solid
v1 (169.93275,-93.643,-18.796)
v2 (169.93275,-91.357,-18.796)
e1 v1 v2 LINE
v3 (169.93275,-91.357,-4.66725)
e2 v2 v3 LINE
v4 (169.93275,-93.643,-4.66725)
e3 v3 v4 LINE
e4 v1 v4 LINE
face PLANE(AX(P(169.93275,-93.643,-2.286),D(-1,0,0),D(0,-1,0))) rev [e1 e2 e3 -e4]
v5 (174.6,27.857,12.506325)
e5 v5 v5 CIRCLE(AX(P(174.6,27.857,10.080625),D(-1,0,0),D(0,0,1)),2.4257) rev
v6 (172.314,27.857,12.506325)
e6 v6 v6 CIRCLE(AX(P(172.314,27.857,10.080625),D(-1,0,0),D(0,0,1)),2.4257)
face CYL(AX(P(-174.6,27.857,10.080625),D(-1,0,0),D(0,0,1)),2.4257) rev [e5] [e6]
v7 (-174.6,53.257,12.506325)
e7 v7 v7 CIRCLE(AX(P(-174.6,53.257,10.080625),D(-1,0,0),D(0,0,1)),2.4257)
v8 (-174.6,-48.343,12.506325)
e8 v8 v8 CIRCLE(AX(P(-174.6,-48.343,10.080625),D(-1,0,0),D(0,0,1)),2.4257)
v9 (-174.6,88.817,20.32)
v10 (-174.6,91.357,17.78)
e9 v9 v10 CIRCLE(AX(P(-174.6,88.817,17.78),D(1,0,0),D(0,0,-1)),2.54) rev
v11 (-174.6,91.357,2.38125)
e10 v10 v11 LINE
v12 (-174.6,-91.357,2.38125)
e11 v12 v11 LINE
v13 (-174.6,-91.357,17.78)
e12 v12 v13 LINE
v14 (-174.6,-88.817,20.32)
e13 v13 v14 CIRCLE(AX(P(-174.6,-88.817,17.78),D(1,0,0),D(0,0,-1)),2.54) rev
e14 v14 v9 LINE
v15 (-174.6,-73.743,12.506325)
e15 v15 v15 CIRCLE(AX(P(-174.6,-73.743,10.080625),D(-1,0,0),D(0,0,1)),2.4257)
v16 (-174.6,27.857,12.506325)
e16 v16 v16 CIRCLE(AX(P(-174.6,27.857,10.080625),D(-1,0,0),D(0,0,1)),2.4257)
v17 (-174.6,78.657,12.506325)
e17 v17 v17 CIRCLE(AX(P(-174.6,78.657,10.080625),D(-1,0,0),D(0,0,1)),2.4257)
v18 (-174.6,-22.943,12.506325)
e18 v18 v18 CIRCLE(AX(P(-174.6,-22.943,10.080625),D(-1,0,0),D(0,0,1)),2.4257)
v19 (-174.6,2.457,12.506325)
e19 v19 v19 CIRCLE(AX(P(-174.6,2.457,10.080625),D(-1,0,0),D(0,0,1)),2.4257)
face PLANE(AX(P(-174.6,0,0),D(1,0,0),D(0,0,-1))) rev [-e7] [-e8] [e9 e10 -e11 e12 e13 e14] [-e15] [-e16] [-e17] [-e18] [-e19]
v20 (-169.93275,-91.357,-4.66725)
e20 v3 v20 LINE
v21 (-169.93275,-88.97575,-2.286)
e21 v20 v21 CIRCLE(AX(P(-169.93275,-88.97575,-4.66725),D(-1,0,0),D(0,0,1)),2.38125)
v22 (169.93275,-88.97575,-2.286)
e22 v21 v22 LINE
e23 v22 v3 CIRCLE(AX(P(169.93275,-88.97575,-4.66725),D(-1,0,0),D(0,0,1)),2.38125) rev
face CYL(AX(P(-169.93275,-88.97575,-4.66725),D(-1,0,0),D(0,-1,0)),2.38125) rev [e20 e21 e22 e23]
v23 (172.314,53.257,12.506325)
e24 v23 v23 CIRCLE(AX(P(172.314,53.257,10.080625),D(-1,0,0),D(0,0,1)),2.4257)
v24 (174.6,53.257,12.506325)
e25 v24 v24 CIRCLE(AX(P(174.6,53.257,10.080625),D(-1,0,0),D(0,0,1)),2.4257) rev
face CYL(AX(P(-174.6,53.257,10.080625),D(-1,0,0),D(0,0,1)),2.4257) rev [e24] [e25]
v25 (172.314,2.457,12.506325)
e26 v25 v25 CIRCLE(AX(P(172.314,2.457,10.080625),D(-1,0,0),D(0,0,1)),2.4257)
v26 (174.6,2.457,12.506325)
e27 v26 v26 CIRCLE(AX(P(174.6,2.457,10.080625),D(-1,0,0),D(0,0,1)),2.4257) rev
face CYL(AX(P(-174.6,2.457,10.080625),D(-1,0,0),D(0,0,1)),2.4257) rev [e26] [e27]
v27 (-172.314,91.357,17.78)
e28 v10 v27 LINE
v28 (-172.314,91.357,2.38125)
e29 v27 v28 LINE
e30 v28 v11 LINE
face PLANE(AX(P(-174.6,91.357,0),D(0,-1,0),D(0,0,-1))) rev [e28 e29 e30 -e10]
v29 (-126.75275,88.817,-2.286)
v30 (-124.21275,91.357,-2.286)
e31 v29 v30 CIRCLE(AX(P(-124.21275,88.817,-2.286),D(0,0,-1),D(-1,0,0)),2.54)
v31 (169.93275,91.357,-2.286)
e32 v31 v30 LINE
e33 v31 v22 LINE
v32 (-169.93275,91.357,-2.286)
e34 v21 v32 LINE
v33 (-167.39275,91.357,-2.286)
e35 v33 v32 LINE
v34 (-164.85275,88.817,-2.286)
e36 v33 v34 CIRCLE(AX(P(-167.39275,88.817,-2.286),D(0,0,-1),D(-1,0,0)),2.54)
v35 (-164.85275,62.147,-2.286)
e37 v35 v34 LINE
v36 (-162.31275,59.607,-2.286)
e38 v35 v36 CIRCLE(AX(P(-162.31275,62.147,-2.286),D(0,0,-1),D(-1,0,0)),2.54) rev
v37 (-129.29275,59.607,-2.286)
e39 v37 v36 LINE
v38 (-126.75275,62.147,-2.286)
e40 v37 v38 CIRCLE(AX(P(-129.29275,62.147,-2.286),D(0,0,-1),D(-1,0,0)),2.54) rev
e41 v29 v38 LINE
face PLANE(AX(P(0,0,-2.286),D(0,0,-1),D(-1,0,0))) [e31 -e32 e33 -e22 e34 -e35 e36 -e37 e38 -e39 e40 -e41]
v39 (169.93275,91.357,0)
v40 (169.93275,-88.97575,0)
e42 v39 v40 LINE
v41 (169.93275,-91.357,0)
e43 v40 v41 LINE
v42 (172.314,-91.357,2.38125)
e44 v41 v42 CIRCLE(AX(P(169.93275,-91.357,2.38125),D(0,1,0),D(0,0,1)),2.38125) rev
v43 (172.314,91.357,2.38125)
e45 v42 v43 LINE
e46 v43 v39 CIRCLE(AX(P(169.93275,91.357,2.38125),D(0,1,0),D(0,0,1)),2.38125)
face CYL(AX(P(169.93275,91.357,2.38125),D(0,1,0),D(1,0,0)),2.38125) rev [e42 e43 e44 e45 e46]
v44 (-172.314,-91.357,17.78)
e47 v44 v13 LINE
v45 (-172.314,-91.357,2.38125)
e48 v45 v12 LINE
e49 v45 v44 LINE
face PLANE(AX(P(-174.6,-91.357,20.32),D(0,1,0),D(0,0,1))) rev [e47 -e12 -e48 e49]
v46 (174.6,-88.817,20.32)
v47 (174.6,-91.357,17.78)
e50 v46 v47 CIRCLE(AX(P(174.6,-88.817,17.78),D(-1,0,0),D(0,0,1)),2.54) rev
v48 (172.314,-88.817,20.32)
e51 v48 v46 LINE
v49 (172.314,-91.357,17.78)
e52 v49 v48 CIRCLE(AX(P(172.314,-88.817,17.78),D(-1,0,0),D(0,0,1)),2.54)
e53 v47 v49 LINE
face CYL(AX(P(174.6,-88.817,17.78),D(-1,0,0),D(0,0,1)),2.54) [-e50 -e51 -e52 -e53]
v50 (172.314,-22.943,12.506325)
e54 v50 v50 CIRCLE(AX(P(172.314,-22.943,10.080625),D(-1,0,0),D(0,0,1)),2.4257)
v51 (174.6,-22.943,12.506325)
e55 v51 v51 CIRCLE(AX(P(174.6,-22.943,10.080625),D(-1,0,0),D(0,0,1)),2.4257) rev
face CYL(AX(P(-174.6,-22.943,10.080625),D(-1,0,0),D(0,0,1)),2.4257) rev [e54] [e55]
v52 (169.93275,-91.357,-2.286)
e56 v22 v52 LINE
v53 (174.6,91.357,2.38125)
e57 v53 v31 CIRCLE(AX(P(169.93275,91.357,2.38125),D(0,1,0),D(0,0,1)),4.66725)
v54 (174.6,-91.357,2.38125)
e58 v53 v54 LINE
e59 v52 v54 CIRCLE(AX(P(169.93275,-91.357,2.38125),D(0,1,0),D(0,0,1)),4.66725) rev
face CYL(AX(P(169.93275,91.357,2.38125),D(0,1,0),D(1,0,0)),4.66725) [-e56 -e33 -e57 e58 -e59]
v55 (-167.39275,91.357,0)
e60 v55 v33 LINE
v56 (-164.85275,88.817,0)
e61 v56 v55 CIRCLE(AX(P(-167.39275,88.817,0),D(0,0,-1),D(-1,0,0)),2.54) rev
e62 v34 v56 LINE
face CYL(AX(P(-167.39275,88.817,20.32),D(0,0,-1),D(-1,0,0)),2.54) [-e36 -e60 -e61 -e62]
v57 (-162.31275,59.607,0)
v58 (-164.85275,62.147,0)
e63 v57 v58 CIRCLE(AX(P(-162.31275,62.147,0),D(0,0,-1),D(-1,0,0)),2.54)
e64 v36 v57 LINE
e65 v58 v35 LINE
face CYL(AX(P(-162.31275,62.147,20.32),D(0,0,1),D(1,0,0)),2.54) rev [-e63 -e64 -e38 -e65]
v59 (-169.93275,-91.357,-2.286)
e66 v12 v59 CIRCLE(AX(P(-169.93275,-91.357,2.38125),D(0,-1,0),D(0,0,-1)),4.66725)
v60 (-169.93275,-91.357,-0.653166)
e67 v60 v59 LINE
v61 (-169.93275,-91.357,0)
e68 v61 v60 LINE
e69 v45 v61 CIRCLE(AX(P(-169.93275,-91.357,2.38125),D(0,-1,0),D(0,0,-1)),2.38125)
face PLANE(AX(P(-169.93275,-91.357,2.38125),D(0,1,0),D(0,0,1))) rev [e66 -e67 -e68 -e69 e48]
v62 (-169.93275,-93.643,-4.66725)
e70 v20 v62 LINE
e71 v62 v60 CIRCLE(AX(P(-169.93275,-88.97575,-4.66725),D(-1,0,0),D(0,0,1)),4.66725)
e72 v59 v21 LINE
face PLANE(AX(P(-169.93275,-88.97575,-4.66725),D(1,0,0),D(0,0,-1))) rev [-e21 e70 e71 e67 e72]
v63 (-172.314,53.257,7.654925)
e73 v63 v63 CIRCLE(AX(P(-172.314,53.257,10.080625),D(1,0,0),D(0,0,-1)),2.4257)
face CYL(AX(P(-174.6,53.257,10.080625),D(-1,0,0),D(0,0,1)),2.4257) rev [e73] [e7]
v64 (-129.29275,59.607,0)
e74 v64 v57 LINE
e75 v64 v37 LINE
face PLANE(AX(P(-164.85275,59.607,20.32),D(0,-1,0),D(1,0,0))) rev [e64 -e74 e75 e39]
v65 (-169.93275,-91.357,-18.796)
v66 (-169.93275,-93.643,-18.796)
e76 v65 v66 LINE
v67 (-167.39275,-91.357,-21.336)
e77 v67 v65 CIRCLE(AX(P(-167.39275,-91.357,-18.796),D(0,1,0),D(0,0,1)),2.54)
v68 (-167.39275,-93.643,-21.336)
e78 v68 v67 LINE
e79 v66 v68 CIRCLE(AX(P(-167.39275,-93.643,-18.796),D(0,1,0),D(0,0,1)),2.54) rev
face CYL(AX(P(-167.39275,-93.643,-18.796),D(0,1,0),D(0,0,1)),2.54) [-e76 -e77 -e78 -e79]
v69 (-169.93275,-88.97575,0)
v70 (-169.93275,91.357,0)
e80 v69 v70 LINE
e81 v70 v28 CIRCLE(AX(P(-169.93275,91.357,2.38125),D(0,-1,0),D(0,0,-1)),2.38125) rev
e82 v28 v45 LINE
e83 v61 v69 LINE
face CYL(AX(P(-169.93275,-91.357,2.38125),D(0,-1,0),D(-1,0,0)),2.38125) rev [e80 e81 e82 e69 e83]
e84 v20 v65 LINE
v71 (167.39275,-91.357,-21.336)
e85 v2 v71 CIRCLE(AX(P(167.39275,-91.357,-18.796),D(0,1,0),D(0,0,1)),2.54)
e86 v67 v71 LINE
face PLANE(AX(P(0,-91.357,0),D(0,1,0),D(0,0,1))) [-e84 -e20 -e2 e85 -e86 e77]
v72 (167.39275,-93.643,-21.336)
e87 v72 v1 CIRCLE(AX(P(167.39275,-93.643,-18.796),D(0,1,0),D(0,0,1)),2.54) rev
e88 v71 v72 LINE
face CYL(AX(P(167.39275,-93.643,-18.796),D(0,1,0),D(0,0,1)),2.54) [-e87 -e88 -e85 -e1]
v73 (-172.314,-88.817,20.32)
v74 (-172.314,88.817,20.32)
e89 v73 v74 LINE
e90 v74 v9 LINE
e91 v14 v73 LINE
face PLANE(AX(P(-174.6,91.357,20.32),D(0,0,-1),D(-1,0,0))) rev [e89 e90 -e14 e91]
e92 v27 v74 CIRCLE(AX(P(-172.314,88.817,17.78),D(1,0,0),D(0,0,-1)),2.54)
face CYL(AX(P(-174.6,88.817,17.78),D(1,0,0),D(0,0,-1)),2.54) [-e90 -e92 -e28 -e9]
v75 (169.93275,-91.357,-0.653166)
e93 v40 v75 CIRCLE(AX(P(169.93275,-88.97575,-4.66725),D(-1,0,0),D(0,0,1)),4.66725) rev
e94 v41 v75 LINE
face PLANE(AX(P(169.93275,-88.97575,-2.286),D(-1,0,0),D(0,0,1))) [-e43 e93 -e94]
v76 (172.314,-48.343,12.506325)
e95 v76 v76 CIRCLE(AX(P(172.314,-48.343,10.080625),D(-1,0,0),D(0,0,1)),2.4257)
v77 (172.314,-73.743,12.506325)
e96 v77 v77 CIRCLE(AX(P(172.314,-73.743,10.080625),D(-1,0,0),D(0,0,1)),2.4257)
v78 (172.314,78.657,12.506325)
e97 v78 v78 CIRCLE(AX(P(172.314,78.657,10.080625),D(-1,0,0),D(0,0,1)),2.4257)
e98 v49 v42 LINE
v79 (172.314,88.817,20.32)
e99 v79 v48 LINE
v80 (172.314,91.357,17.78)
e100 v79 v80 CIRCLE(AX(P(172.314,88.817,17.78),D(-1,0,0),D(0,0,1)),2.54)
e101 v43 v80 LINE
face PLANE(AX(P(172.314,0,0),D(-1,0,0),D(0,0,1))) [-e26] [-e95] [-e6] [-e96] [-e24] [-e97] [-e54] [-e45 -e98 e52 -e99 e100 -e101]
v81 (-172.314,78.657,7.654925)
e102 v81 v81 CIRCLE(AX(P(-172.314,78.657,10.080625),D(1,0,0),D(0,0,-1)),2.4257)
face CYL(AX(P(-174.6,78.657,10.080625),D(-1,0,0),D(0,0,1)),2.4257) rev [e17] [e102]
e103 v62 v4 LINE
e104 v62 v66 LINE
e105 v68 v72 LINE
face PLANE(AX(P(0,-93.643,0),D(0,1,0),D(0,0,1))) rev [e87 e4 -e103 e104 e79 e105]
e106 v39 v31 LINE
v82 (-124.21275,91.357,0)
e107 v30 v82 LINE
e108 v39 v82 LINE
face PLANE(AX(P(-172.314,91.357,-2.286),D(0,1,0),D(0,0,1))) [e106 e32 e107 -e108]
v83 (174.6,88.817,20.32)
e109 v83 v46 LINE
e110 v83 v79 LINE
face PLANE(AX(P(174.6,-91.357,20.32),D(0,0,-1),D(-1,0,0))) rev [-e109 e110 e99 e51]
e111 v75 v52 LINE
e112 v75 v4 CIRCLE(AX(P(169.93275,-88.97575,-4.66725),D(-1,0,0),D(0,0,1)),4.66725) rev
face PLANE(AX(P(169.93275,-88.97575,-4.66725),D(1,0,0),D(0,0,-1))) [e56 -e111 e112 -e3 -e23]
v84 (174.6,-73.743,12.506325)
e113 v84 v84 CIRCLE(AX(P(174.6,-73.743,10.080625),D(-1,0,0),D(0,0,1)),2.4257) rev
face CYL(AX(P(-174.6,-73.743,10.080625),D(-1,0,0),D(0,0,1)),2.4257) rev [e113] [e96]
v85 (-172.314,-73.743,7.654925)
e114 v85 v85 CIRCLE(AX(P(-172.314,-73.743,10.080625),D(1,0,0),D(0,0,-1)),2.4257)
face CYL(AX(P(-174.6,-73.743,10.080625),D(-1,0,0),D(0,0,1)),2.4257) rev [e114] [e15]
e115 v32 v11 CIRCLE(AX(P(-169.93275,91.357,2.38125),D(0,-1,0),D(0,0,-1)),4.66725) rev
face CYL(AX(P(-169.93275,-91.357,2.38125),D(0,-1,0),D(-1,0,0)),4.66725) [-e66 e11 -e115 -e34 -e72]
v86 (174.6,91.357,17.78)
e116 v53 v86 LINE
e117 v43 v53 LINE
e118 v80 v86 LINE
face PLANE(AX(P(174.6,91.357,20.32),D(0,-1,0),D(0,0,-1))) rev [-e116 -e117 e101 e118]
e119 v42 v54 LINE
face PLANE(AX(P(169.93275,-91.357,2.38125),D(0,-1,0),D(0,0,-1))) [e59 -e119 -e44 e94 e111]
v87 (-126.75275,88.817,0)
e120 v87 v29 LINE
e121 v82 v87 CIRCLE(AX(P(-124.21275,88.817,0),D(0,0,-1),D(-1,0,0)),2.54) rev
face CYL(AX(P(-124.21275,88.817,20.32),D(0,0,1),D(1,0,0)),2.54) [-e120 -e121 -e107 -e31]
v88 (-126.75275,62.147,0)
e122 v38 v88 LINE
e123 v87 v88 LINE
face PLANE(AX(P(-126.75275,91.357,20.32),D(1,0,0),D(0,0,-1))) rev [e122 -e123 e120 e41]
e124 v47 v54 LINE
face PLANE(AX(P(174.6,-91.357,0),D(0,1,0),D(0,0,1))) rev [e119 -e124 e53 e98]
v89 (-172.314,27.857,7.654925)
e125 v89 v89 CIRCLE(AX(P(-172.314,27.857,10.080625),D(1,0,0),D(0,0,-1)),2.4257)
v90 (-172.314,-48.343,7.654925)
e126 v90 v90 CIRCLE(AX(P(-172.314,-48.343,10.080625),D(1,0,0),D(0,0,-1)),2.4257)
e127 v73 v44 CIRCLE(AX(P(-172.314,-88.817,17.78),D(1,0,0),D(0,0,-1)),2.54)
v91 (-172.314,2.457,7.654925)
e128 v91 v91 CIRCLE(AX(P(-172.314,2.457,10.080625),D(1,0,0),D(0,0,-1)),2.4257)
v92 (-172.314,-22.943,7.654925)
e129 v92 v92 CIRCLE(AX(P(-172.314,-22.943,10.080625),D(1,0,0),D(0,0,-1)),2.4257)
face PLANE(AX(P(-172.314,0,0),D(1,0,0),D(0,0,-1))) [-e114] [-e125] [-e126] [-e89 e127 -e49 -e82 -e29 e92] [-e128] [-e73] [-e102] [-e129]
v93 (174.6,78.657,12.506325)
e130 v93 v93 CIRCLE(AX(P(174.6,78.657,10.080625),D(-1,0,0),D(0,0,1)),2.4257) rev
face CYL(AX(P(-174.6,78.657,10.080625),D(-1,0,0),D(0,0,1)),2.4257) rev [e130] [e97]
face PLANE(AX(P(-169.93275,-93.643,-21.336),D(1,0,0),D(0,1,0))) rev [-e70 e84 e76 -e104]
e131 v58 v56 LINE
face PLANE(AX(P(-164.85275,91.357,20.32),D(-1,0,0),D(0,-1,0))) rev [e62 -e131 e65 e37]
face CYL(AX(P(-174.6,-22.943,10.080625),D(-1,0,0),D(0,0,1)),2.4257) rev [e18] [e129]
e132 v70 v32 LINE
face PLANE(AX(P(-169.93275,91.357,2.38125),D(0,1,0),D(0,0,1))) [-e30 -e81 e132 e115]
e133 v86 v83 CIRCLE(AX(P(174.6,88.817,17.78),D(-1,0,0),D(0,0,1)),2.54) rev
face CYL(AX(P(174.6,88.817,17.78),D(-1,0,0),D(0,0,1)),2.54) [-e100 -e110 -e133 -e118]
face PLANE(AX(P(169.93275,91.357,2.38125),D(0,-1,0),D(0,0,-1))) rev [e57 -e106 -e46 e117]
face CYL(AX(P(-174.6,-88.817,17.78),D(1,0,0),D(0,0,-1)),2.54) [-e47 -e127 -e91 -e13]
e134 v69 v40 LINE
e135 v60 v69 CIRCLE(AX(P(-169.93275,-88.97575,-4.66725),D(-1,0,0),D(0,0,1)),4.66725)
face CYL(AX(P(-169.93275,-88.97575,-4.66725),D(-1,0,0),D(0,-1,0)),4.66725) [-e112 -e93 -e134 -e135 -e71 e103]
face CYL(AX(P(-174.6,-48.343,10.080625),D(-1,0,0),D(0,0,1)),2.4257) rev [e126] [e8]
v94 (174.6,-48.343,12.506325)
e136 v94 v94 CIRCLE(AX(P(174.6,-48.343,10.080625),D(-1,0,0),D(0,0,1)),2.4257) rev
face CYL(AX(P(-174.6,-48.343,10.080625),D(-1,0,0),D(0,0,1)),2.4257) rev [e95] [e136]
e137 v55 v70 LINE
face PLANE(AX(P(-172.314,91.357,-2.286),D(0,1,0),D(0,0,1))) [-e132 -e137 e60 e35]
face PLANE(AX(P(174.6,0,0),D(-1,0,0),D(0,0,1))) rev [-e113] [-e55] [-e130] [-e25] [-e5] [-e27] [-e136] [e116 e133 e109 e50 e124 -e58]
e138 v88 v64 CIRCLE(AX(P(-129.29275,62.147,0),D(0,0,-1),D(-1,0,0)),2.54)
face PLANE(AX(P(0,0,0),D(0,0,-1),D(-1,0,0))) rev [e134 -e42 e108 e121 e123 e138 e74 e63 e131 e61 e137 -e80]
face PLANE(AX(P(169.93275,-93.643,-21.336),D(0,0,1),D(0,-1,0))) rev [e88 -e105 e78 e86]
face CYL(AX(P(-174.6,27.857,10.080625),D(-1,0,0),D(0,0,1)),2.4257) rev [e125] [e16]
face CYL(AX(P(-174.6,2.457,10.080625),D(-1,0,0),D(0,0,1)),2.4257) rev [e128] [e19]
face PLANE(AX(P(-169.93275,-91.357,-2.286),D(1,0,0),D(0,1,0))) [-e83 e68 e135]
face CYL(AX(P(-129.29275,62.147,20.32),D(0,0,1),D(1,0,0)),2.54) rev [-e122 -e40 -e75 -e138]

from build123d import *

# Parameters (mm, degrees)
SKETCH1_W                       = 344.6280001
SKETCH1_H                       = 182.714000078
BASE_FLANGE1_DEPTH              = 2.286
EDGE_FLANGE1_STRIP_W            = 13.9065
EDGE_FLANGE1_STRIP_H            = 2.286
EDGE_FLANGE1_STRIP_CUT_DEPTH    = 182.714000078
EDGE_FLANGE1_STRIP_2_W          = 13.9065
EDGE_FLANGE1_STRIP_2_H          = 2.286
EDGE_FLANGE1_STRIP_CUT_2_DEPTH  = 182.714000078
EDGE_FLANGE1_DEPTH              = 182.714000078
EDGE_FLANGE1_BEND_DEPTH         = 182.714000078
EDGE_FLANGE2_STRIP_W            = 13.9065
EDGE_FLANGE2_STRIP_H            = 2.286
EDGE_FLANGE2_STRIP_CUT_DEPTH    = 339.8655001
EDGE_FLANGE2_DEPTH              = 339.8655001
SKETCH17_W                      = 38.1
SKETCH17_H                      = 31.75
CUT_EXTRUDE1_DEPTH              = 200.412142834
FILLET1_R                       = 2.54
F_11_0_191_DIAMETER_HOLE1_D     = 4.8514
F_11_0_191_DIAMETER_HOLE1_DEPTH = 349.2000001
F_11_0_191_DIAMETER_HOLE1_TIP   = 1.457507604


# Sheet-metal steps are written as plain solids
with BuildPart() as part:
    # Sketch1 → Base-Flange1 (new body)
    with BuildSketch(Plane.XY):
        Rectangle(SKETCH1_W, SKETCH1_H)
    extrude(amount=-BASE_FLANGE1_DEPTH)

    # Edge-Flange1 strip (across the edge) → Edge-Flange1 strip cut (cut)
    with BuildSketch(Plane(origin=(172.31400005, -91.357000039, 0), x_dir=(-1, 0, 0), z_dir=(0, 1, 0))):
        with Locations((-4.572, -1.143)):
            Rectangle(EDGE_FLANGE1_STRIP_W, EDGE_FLANGE1_STRIP_H)
    extrude(amount=EDGE_FLANGE1_STRIP_CUT_DEPTH, mode=Mode.SUBTRACT)

    # Edge-Flange1 strip 2 (across the edge) → Edge-Flange1 strip cut 2 (cut)
    with BuildSketch(Plane(origin=(-172.31400005, 91.357000039, 0), x_dir=(1, 0, 0), z_dir=(0, -1, 0))):
        with Locations((-4.572, -1.143)):
            Rectangle(EDGE_FLANGE1_STRIP_2_W, EDGE_FLANGE1_STRIP_2_H)
    extrude(amount=EDGE_FLANGE1_STRIP_CUT_2_DEPTH, mode=Mode.SUBTRACT)

    # Edge-Flange1 section (across the edge) → Edge-Flange1 (add)
    with BuildSketch(Plane(origin=(172.31400005, -91.357000039, 0), x_dir=(-1, 0, 0), z_dir=(0, 1, 0))):
        with BuildLine():
            Line((-2.286, 2.38125), (-2.286, 20.32))
            Line((-2.286, 20.32), (0, 20.32))
            Line((0, 20.32), (0, 2.38125))
            ThreePointArc((0, 2.38125), (0.697451977, 0.697451977), (2.38125, 0))
            Line((2.38125, 0), (2.38125, -2.286))
            ThreePointArc((2.38125, -2.286), (-0.918994124, -0.918994124), (-2.286, 2.38125))
        make_face()
    extrude(amount=EDGE_FLANGE1_DEPTH)

    # Edge-Flange1 section 2 (across the edge) → Edge-Flange1 bend (add)
    with BuildSketch(Plane(origin=(-172.31400005, 91.357000039, 0), x_dir=(1, 0, 0), z_dir=(0, -1, 0))):
        with BuildLine():
            Line((-2.286, 2.38125), (-2.286, 20.32))
            Line((-2.286, 20.32), (0, 20.32))
            Line((0, 20.32), (0, 2.38125))
            ThreePointArc((0, 2.38125), (0.697451977, 0.697451977), (2.38125, 0))
            Line((2.38125, 0), (2.38125, -2.286))
            ThreePointArc((2.38125, -2.286), (-0.918994124, -0.918994124), (-2.286, 2.38125))
        make_face()
    extrude(amount=EDGE_FLANGE1_BEND_DEPTH)

    # Edge-Flange2 strip (across the edge) → Edge-Flange2 strip cut (cut)
    with BuildSketch(Plane(origin=(169.93275005, -91.357000039, -2.286), x_dir=(0, 1, 0), z_dir=(-1, 0, 0))):
        with Locations((-4.572, -1.143)):
            Rectangle(EDGE_FLANGE2_STRIP_W, EDGE_FLANGE2_STRIP_H)
    extrude(amount=EDGE_FLANGE2_STRIP_CUT_DEPTH, mode=Mode.SUBTRACT)

    # Edge-Flange2 section (across the edge) → Edge-Flange2 (add)
    with BuildSketch(Plane(origin=(169.93275005, -91.357000039, -2.286), x_dir=(0, 1, 0), z_dir=(-1, 0, 0))):
        with BuildLine():
            Line((-2.286, 2.38125), (-2.286, 19.05))
            Line((-2.286, 19.05), (0, 19.05))
            Line((0, 19.05), (0, 2.38125))
            ThreePointArc((0, 2.38125), (0.697451977, 0.697451977), (2.38125, 0))
            Line((2.38125, 0), (2.38125, -2.286))
            ThreePointArc((2.38125, -2.286), (-0.918994124, -0.918994124), (-2.286, 2.38125))
        make_face()
    extrude(amount=EDGE_FLANGE2_DEPTH)

    # Sketch17 → Cut-Extrude1 (cut, through all)
    with BuildSketch(Plane(origin=(0, 0, -2.286), x_dir=(-1, 0, 0), z_dir=(0, 0, -1))):
        with Locations((145.80275005, 75.482000039)):
            Rectangle(SKETCH17_W, SKETCH17_H)
    extrude(amount=-CUT_EXTRUDE1_DEPTH, mode=Mode.SUBTRACT)

    # Fillet1
    fillet1_edges = [part.edges().sort_by_distance(p)[0] for p in [
        (169.93275005, -92.500000039, -21.336),
        (-169.93275005, -92.500000039, -21.336),
        (-126.75275005, 91.357000039, -1.143),
        (-164.85275005, 91.357000039, -1.143),
        (-164.85275005, 59.607000039, -1.143),
        (-126.75275005, 59.607000039, -1.143),
        (173.45700005, -91.357000039, 20.32),
        (173.45700005, 91.357000039, 20.32),
        (-173.45700005, 91.357000039, 20.32),
        (-173.45700005, -91.357000039, 20.32),
    ]]
    fillet(fillet1_edges, radius=FILLET1_R)

    # #11 (0.191) Diameter Hole1
    with Locations(Plane.ZY.offset(174.60000005)):
        with Locations((10.080625, -73.742999961), (10.080625, 78.657000039), (10.080625, 53.257000039), (10.080625, 27.857000039), (10.080625, 2.457000039), (10.080625, -22.942999961), (10.080625, -48.342999961)):
            Hole(F_11_0_191_DIAMETER_HOLE1_D / 2, depth=F_11_0_191_DIAMETER_HOLE1_DEPTH)
            with Locations((0, 0, -(F_11_0_191_DIAMETER_HOLE1_DEPTH + F_11_0_191_DIAMETER_HOLE1_TIP / 2))):  # 118° drill point
                Cone(0, F_11_0_191_DIAMETER_HOLE1_D / 2, F_11_0_191_DIAMETER_HOLE1_TIP, mode=Mode.SUBTRACT)


solid = part.part
